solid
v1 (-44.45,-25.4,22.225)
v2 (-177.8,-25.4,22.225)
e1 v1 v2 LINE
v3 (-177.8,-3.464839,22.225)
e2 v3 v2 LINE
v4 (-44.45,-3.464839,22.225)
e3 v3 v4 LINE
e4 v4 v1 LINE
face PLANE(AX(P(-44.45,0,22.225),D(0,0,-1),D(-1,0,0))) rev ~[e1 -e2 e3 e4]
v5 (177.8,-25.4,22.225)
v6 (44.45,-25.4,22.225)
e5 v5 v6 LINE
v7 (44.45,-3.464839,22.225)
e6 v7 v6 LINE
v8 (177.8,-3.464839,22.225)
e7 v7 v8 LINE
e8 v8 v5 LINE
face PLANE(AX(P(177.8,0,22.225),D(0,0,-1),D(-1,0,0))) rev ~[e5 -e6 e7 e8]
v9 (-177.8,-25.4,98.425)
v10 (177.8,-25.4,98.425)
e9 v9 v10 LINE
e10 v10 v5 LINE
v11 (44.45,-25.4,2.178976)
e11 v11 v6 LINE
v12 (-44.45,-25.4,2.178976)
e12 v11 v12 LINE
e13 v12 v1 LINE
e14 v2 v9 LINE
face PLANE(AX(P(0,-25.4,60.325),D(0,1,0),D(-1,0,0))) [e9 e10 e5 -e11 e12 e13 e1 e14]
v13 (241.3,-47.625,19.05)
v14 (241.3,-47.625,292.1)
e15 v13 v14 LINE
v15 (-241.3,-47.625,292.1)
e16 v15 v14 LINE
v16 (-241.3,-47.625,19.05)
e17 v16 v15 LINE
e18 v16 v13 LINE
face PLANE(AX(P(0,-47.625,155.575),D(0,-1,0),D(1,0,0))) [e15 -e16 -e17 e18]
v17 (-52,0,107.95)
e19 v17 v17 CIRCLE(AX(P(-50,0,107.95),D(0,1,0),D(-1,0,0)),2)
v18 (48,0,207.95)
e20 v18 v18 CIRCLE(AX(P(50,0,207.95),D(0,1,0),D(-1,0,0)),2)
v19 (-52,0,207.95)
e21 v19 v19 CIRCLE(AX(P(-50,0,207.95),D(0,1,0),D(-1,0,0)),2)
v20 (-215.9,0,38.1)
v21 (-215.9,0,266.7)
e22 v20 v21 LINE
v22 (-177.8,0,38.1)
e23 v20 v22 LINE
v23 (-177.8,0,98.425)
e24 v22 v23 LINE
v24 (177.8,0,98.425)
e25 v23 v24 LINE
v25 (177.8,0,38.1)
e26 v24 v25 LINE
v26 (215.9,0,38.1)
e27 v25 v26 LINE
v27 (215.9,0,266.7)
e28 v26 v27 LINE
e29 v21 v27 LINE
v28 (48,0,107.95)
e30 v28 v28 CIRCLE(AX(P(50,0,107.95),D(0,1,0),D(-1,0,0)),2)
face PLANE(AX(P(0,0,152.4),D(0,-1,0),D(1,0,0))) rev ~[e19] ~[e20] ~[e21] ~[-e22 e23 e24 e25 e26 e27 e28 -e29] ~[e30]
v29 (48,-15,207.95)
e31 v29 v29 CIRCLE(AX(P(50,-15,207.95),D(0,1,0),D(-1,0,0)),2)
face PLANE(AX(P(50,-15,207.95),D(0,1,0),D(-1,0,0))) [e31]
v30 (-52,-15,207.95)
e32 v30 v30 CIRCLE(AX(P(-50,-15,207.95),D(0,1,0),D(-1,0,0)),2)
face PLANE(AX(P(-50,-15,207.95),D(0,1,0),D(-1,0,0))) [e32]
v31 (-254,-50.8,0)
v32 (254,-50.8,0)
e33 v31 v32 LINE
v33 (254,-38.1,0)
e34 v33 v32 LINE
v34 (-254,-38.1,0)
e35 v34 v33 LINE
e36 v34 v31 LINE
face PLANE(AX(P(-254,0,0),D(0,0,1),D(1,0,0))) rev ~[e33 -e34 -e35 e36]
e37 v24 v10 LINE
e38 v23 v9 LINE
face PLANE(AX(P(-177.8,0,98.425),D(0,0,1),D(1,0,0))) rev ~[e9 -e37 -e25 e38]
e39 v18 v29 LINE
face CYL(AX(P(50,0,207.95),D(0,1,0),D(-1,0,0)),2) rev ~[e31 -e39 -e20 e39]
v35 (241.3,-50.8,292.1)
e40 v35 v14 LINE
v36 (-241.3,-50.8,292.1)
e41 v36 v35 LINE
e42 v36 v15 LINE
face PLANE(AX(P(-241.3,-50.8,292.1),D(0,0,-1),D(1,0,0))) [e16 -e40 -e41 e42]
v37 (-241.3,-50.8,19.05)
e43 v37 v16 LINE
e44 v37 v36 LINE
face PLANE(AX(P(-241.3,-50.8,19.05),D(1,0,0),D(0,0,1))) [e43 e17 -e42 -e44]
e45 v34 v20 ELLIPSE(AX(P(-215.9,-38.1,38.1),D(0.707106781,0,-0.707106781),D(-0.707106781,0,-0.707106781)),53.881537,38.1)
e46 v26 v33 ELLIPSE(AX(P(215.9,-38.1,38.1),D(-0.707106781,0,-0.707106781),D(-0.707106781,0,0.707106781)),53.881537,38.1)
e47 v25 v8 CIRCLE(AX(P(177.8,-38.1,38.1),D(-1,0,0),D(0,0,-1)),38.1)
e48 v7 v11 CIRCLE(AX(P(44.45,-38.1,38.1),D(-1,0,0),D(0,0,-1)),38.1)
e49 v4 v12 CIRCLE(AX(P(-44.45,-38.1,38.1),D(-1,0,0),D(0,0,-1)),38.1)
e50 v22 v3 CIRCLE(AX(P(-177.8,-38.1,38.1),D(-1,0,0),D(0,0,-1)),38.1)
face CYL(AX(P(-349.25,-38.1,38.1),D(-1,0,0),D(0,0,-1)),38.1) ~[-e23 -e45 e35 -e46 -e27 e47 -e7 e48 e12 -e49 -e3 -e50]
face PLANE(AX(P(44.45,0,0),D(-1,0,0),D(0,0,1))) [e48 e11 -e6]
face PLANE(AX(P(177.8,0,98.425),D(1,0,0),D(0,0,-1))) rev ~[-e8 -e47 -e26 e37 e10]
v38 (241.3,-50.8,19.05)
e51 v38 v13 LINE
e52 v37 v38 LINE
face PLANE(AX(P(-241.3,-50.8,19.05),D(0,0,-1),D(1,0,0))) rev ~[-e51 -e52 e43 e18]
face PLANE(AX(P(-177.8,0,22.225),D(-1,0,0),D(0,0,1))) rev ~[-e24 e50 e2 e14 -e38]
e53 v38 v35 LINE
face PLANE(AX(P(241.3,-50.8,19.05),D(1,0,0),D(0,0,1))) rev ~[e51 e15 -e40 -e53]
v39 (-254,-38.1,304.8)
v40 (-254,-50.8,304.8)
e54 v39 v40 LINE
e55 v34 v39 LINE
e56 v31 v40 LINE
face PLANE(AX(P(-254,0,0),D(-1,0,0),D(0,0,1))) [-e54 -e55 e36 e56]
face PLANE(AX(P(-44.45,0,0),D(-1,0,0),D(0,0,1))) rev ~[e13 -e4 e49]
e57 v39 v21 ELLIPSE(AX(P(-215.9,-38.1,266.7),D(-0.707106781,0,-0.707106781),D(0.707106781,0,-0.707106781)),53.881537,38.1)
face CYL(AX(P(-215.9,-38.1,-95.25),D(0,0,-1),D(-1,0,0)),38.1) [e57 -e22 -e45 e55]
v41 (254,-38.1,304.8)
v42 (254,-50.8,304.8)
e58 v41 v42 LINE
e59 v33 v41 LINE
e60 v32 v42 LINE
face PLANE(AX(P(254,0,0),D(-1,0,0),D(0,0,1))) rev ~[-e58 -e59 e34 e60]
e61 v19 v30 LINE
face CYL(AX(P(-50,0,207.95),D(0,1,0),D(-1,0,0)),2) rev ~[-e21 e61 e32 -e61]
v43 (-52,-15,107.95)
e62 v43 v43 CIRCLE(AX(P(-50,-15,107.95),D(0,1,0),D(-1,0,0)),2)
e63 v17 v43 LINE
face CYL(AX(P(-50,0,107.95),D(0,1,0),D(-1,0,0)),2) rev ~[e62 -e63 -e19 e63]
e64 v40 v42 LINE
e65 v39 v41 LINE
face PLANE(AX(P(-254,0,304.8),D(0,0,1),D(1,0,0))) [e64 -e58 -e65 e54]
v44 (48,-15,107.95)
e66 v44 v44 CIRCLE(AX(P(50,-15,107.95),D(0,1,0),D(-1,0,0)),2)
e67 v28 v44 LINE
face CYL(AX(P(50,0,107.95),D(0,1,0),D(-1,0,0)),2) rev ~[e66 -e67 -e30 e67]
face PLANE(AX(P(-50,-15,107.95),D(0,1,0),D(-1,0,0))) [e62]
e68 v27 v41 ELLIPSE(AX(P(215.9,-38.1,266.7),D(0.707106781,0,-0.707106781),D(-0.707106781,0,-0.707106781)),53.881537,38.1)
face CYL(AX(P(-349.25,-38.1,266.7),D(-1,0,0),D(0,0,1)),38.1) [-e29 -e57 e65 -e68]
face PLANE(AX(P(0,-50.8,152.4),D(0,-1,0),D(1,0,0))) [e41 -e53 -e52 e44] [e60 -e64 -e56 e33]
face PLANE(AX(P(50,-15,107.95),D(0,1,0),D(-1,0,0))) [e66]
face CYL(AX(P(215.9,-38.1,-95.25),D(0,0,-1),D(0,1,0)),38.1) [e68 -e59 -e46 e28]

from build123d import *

# Parameters (mm, degrees)
F0_W        = 508
F0_H        = 304.8
F1_DEPTH    = 50.8
F2_W        = 482.6
F2_H        = 273.05
F3_DEPTH    = 3.175
F4_R        = 2
F5_DEPTH    = 15
F6_W        = 88.9
F6_H        = 22.225
F7_DEPTH    = 25.4
F8_T1_DEPTH = 400.05
F8_T3_DEPTH = 495.3
F8_T5_DEPTH = 698.5
F8_T7_DEPTH = 400.05


# Not quite as in the source:
# - a fillet or chamfer that OpenCascade refuses, or shapes differently, is made with other operations: its cross-section is extruded or revolved along the edge and cut away or added


with BuildPart() as f1:
    # F0 (on Front) → F1 (new body)
    with BuildSketch(Plane.XZ):
        with Locations((0, 152.4)):
            Rectangle(F0_W, F0_H)
    extrude(amount=F1_DEPTH)

    # F2 (on face) → F3 (cut)
    with BuildSketch(Plane.XZ.offset(50.8)):
        with Locations((0, 155.575)):
            Rectangle(F2_W, F2_H)
    extrude(amount=-F3_DEPTH, mode=Mode.SUBTRACT)

    # F4 (on face) → F5 (cut)
    with BuildSketch(Plane(origin=(0, 0, 0), x_dir=(-1, 0, 0), z_dir=(0, 1, 0))):
        with Locations((-50, 207.95)):
            Circle(F4_R)
        with Locations((50, 207.95)):
            Circle(F4_R)
        with Locations((-50, 107.95)):
            Circle(F4_R)
        with Locations((50, 107.95)):
            Circle(F4_R)
    extrude(amount=-F5_DEPTH, mode=Mode.SUBTRACT)

    # F6 (on face) → F7 (cut)
    with BuildSketch(Plane(origin=(0, 0, 0), x_dir=(-1, 0, 0), z_dir=(0, 1, 0))):
        Polygon((177.8, 98.425), (-177.8, 98.425), (-177.8, 22.225), (-44.45, 22.225), (44.45, 22.225), (177.8, 22.225), align=None)
        with Locations((0, 11.1125)):
            Rectangle(F6_W, F6_H)
    extrude(amount=-F7_DEPTH, mode=Mode.SUBTRACT)

    # F8: fillet of radius 38.1 on 5 edges, made by hand

    # F8_s2 → F8_t1 (cut)
    with BuildSketch(Plane.YZ.offset(-50.8)):
        with BuildLine():
            ThreePointArc((-38.1, 0), (-11.1592316368, 11.1592316368), (0, 38.1))
            Line((0, 38.1), (0, 0))
            Line((0, 0), (-38.1, 0))
        make_face()
    extrude(amount=F8_T1_DEPTH, mode=Mode.SUBTRACT)

    # F8_s4 → F8_t3 (cut)
    with BuildSketch(Plane.XY.offset(-95.25)):
        with BuildLine():
            ThreePointArc((215.9, 0), (242.8407683632, -11.1592316368), (254, -38.1))
            Line((254, -38.1), (254, 0))
            Line((254, 0), (215.9, 0))
        make_face()
        with BuildLine():
            ThreePointArc((-254, -38.1), (-242.8407683632, -11.1592316368), (-215.9, 0))
            Line((-215.9, 0), (-254, 0))
            Line((-254, 0), (-254, -38.1))
        make_face()
    extrude(amount=F8_T3_DEPTH, mode=Mode.SUBTRACT)

    # F8_s6 → F8_t5 (cut)
    with BuildSketch(Plane.YZ.offset(-349.25)):
        with BuildLine():
            ThreePointArc((-38.1, 304.8), (-11.1592316368, 293.6407683632), (0, 266.7))
            Line((0, 266.7), (0, 304.8))
            Line((0, 304.8), (-38.1, 304.8))
        make_face()
    extrude(amount=F8_T5_DEPTH, mode=Mode.SUBTRACT)

    # F8_s8 → F8_t7 (cut)
    with BuildSketch(Plane.YZ.offset(-349.25)):
        with BuildLine():
            ThreePointArc((-38.1, 0), (-11.1592316368, 11.1592316368), (0, 38.1))
            Line((0, 38.1), (0, 0))
            Line((0, 0), (-38.1, 0))
        make_face()
    extrude(amount=F8_T7_DEPTH, mode=Mode.SUBTRACT)


solid = f1.part
